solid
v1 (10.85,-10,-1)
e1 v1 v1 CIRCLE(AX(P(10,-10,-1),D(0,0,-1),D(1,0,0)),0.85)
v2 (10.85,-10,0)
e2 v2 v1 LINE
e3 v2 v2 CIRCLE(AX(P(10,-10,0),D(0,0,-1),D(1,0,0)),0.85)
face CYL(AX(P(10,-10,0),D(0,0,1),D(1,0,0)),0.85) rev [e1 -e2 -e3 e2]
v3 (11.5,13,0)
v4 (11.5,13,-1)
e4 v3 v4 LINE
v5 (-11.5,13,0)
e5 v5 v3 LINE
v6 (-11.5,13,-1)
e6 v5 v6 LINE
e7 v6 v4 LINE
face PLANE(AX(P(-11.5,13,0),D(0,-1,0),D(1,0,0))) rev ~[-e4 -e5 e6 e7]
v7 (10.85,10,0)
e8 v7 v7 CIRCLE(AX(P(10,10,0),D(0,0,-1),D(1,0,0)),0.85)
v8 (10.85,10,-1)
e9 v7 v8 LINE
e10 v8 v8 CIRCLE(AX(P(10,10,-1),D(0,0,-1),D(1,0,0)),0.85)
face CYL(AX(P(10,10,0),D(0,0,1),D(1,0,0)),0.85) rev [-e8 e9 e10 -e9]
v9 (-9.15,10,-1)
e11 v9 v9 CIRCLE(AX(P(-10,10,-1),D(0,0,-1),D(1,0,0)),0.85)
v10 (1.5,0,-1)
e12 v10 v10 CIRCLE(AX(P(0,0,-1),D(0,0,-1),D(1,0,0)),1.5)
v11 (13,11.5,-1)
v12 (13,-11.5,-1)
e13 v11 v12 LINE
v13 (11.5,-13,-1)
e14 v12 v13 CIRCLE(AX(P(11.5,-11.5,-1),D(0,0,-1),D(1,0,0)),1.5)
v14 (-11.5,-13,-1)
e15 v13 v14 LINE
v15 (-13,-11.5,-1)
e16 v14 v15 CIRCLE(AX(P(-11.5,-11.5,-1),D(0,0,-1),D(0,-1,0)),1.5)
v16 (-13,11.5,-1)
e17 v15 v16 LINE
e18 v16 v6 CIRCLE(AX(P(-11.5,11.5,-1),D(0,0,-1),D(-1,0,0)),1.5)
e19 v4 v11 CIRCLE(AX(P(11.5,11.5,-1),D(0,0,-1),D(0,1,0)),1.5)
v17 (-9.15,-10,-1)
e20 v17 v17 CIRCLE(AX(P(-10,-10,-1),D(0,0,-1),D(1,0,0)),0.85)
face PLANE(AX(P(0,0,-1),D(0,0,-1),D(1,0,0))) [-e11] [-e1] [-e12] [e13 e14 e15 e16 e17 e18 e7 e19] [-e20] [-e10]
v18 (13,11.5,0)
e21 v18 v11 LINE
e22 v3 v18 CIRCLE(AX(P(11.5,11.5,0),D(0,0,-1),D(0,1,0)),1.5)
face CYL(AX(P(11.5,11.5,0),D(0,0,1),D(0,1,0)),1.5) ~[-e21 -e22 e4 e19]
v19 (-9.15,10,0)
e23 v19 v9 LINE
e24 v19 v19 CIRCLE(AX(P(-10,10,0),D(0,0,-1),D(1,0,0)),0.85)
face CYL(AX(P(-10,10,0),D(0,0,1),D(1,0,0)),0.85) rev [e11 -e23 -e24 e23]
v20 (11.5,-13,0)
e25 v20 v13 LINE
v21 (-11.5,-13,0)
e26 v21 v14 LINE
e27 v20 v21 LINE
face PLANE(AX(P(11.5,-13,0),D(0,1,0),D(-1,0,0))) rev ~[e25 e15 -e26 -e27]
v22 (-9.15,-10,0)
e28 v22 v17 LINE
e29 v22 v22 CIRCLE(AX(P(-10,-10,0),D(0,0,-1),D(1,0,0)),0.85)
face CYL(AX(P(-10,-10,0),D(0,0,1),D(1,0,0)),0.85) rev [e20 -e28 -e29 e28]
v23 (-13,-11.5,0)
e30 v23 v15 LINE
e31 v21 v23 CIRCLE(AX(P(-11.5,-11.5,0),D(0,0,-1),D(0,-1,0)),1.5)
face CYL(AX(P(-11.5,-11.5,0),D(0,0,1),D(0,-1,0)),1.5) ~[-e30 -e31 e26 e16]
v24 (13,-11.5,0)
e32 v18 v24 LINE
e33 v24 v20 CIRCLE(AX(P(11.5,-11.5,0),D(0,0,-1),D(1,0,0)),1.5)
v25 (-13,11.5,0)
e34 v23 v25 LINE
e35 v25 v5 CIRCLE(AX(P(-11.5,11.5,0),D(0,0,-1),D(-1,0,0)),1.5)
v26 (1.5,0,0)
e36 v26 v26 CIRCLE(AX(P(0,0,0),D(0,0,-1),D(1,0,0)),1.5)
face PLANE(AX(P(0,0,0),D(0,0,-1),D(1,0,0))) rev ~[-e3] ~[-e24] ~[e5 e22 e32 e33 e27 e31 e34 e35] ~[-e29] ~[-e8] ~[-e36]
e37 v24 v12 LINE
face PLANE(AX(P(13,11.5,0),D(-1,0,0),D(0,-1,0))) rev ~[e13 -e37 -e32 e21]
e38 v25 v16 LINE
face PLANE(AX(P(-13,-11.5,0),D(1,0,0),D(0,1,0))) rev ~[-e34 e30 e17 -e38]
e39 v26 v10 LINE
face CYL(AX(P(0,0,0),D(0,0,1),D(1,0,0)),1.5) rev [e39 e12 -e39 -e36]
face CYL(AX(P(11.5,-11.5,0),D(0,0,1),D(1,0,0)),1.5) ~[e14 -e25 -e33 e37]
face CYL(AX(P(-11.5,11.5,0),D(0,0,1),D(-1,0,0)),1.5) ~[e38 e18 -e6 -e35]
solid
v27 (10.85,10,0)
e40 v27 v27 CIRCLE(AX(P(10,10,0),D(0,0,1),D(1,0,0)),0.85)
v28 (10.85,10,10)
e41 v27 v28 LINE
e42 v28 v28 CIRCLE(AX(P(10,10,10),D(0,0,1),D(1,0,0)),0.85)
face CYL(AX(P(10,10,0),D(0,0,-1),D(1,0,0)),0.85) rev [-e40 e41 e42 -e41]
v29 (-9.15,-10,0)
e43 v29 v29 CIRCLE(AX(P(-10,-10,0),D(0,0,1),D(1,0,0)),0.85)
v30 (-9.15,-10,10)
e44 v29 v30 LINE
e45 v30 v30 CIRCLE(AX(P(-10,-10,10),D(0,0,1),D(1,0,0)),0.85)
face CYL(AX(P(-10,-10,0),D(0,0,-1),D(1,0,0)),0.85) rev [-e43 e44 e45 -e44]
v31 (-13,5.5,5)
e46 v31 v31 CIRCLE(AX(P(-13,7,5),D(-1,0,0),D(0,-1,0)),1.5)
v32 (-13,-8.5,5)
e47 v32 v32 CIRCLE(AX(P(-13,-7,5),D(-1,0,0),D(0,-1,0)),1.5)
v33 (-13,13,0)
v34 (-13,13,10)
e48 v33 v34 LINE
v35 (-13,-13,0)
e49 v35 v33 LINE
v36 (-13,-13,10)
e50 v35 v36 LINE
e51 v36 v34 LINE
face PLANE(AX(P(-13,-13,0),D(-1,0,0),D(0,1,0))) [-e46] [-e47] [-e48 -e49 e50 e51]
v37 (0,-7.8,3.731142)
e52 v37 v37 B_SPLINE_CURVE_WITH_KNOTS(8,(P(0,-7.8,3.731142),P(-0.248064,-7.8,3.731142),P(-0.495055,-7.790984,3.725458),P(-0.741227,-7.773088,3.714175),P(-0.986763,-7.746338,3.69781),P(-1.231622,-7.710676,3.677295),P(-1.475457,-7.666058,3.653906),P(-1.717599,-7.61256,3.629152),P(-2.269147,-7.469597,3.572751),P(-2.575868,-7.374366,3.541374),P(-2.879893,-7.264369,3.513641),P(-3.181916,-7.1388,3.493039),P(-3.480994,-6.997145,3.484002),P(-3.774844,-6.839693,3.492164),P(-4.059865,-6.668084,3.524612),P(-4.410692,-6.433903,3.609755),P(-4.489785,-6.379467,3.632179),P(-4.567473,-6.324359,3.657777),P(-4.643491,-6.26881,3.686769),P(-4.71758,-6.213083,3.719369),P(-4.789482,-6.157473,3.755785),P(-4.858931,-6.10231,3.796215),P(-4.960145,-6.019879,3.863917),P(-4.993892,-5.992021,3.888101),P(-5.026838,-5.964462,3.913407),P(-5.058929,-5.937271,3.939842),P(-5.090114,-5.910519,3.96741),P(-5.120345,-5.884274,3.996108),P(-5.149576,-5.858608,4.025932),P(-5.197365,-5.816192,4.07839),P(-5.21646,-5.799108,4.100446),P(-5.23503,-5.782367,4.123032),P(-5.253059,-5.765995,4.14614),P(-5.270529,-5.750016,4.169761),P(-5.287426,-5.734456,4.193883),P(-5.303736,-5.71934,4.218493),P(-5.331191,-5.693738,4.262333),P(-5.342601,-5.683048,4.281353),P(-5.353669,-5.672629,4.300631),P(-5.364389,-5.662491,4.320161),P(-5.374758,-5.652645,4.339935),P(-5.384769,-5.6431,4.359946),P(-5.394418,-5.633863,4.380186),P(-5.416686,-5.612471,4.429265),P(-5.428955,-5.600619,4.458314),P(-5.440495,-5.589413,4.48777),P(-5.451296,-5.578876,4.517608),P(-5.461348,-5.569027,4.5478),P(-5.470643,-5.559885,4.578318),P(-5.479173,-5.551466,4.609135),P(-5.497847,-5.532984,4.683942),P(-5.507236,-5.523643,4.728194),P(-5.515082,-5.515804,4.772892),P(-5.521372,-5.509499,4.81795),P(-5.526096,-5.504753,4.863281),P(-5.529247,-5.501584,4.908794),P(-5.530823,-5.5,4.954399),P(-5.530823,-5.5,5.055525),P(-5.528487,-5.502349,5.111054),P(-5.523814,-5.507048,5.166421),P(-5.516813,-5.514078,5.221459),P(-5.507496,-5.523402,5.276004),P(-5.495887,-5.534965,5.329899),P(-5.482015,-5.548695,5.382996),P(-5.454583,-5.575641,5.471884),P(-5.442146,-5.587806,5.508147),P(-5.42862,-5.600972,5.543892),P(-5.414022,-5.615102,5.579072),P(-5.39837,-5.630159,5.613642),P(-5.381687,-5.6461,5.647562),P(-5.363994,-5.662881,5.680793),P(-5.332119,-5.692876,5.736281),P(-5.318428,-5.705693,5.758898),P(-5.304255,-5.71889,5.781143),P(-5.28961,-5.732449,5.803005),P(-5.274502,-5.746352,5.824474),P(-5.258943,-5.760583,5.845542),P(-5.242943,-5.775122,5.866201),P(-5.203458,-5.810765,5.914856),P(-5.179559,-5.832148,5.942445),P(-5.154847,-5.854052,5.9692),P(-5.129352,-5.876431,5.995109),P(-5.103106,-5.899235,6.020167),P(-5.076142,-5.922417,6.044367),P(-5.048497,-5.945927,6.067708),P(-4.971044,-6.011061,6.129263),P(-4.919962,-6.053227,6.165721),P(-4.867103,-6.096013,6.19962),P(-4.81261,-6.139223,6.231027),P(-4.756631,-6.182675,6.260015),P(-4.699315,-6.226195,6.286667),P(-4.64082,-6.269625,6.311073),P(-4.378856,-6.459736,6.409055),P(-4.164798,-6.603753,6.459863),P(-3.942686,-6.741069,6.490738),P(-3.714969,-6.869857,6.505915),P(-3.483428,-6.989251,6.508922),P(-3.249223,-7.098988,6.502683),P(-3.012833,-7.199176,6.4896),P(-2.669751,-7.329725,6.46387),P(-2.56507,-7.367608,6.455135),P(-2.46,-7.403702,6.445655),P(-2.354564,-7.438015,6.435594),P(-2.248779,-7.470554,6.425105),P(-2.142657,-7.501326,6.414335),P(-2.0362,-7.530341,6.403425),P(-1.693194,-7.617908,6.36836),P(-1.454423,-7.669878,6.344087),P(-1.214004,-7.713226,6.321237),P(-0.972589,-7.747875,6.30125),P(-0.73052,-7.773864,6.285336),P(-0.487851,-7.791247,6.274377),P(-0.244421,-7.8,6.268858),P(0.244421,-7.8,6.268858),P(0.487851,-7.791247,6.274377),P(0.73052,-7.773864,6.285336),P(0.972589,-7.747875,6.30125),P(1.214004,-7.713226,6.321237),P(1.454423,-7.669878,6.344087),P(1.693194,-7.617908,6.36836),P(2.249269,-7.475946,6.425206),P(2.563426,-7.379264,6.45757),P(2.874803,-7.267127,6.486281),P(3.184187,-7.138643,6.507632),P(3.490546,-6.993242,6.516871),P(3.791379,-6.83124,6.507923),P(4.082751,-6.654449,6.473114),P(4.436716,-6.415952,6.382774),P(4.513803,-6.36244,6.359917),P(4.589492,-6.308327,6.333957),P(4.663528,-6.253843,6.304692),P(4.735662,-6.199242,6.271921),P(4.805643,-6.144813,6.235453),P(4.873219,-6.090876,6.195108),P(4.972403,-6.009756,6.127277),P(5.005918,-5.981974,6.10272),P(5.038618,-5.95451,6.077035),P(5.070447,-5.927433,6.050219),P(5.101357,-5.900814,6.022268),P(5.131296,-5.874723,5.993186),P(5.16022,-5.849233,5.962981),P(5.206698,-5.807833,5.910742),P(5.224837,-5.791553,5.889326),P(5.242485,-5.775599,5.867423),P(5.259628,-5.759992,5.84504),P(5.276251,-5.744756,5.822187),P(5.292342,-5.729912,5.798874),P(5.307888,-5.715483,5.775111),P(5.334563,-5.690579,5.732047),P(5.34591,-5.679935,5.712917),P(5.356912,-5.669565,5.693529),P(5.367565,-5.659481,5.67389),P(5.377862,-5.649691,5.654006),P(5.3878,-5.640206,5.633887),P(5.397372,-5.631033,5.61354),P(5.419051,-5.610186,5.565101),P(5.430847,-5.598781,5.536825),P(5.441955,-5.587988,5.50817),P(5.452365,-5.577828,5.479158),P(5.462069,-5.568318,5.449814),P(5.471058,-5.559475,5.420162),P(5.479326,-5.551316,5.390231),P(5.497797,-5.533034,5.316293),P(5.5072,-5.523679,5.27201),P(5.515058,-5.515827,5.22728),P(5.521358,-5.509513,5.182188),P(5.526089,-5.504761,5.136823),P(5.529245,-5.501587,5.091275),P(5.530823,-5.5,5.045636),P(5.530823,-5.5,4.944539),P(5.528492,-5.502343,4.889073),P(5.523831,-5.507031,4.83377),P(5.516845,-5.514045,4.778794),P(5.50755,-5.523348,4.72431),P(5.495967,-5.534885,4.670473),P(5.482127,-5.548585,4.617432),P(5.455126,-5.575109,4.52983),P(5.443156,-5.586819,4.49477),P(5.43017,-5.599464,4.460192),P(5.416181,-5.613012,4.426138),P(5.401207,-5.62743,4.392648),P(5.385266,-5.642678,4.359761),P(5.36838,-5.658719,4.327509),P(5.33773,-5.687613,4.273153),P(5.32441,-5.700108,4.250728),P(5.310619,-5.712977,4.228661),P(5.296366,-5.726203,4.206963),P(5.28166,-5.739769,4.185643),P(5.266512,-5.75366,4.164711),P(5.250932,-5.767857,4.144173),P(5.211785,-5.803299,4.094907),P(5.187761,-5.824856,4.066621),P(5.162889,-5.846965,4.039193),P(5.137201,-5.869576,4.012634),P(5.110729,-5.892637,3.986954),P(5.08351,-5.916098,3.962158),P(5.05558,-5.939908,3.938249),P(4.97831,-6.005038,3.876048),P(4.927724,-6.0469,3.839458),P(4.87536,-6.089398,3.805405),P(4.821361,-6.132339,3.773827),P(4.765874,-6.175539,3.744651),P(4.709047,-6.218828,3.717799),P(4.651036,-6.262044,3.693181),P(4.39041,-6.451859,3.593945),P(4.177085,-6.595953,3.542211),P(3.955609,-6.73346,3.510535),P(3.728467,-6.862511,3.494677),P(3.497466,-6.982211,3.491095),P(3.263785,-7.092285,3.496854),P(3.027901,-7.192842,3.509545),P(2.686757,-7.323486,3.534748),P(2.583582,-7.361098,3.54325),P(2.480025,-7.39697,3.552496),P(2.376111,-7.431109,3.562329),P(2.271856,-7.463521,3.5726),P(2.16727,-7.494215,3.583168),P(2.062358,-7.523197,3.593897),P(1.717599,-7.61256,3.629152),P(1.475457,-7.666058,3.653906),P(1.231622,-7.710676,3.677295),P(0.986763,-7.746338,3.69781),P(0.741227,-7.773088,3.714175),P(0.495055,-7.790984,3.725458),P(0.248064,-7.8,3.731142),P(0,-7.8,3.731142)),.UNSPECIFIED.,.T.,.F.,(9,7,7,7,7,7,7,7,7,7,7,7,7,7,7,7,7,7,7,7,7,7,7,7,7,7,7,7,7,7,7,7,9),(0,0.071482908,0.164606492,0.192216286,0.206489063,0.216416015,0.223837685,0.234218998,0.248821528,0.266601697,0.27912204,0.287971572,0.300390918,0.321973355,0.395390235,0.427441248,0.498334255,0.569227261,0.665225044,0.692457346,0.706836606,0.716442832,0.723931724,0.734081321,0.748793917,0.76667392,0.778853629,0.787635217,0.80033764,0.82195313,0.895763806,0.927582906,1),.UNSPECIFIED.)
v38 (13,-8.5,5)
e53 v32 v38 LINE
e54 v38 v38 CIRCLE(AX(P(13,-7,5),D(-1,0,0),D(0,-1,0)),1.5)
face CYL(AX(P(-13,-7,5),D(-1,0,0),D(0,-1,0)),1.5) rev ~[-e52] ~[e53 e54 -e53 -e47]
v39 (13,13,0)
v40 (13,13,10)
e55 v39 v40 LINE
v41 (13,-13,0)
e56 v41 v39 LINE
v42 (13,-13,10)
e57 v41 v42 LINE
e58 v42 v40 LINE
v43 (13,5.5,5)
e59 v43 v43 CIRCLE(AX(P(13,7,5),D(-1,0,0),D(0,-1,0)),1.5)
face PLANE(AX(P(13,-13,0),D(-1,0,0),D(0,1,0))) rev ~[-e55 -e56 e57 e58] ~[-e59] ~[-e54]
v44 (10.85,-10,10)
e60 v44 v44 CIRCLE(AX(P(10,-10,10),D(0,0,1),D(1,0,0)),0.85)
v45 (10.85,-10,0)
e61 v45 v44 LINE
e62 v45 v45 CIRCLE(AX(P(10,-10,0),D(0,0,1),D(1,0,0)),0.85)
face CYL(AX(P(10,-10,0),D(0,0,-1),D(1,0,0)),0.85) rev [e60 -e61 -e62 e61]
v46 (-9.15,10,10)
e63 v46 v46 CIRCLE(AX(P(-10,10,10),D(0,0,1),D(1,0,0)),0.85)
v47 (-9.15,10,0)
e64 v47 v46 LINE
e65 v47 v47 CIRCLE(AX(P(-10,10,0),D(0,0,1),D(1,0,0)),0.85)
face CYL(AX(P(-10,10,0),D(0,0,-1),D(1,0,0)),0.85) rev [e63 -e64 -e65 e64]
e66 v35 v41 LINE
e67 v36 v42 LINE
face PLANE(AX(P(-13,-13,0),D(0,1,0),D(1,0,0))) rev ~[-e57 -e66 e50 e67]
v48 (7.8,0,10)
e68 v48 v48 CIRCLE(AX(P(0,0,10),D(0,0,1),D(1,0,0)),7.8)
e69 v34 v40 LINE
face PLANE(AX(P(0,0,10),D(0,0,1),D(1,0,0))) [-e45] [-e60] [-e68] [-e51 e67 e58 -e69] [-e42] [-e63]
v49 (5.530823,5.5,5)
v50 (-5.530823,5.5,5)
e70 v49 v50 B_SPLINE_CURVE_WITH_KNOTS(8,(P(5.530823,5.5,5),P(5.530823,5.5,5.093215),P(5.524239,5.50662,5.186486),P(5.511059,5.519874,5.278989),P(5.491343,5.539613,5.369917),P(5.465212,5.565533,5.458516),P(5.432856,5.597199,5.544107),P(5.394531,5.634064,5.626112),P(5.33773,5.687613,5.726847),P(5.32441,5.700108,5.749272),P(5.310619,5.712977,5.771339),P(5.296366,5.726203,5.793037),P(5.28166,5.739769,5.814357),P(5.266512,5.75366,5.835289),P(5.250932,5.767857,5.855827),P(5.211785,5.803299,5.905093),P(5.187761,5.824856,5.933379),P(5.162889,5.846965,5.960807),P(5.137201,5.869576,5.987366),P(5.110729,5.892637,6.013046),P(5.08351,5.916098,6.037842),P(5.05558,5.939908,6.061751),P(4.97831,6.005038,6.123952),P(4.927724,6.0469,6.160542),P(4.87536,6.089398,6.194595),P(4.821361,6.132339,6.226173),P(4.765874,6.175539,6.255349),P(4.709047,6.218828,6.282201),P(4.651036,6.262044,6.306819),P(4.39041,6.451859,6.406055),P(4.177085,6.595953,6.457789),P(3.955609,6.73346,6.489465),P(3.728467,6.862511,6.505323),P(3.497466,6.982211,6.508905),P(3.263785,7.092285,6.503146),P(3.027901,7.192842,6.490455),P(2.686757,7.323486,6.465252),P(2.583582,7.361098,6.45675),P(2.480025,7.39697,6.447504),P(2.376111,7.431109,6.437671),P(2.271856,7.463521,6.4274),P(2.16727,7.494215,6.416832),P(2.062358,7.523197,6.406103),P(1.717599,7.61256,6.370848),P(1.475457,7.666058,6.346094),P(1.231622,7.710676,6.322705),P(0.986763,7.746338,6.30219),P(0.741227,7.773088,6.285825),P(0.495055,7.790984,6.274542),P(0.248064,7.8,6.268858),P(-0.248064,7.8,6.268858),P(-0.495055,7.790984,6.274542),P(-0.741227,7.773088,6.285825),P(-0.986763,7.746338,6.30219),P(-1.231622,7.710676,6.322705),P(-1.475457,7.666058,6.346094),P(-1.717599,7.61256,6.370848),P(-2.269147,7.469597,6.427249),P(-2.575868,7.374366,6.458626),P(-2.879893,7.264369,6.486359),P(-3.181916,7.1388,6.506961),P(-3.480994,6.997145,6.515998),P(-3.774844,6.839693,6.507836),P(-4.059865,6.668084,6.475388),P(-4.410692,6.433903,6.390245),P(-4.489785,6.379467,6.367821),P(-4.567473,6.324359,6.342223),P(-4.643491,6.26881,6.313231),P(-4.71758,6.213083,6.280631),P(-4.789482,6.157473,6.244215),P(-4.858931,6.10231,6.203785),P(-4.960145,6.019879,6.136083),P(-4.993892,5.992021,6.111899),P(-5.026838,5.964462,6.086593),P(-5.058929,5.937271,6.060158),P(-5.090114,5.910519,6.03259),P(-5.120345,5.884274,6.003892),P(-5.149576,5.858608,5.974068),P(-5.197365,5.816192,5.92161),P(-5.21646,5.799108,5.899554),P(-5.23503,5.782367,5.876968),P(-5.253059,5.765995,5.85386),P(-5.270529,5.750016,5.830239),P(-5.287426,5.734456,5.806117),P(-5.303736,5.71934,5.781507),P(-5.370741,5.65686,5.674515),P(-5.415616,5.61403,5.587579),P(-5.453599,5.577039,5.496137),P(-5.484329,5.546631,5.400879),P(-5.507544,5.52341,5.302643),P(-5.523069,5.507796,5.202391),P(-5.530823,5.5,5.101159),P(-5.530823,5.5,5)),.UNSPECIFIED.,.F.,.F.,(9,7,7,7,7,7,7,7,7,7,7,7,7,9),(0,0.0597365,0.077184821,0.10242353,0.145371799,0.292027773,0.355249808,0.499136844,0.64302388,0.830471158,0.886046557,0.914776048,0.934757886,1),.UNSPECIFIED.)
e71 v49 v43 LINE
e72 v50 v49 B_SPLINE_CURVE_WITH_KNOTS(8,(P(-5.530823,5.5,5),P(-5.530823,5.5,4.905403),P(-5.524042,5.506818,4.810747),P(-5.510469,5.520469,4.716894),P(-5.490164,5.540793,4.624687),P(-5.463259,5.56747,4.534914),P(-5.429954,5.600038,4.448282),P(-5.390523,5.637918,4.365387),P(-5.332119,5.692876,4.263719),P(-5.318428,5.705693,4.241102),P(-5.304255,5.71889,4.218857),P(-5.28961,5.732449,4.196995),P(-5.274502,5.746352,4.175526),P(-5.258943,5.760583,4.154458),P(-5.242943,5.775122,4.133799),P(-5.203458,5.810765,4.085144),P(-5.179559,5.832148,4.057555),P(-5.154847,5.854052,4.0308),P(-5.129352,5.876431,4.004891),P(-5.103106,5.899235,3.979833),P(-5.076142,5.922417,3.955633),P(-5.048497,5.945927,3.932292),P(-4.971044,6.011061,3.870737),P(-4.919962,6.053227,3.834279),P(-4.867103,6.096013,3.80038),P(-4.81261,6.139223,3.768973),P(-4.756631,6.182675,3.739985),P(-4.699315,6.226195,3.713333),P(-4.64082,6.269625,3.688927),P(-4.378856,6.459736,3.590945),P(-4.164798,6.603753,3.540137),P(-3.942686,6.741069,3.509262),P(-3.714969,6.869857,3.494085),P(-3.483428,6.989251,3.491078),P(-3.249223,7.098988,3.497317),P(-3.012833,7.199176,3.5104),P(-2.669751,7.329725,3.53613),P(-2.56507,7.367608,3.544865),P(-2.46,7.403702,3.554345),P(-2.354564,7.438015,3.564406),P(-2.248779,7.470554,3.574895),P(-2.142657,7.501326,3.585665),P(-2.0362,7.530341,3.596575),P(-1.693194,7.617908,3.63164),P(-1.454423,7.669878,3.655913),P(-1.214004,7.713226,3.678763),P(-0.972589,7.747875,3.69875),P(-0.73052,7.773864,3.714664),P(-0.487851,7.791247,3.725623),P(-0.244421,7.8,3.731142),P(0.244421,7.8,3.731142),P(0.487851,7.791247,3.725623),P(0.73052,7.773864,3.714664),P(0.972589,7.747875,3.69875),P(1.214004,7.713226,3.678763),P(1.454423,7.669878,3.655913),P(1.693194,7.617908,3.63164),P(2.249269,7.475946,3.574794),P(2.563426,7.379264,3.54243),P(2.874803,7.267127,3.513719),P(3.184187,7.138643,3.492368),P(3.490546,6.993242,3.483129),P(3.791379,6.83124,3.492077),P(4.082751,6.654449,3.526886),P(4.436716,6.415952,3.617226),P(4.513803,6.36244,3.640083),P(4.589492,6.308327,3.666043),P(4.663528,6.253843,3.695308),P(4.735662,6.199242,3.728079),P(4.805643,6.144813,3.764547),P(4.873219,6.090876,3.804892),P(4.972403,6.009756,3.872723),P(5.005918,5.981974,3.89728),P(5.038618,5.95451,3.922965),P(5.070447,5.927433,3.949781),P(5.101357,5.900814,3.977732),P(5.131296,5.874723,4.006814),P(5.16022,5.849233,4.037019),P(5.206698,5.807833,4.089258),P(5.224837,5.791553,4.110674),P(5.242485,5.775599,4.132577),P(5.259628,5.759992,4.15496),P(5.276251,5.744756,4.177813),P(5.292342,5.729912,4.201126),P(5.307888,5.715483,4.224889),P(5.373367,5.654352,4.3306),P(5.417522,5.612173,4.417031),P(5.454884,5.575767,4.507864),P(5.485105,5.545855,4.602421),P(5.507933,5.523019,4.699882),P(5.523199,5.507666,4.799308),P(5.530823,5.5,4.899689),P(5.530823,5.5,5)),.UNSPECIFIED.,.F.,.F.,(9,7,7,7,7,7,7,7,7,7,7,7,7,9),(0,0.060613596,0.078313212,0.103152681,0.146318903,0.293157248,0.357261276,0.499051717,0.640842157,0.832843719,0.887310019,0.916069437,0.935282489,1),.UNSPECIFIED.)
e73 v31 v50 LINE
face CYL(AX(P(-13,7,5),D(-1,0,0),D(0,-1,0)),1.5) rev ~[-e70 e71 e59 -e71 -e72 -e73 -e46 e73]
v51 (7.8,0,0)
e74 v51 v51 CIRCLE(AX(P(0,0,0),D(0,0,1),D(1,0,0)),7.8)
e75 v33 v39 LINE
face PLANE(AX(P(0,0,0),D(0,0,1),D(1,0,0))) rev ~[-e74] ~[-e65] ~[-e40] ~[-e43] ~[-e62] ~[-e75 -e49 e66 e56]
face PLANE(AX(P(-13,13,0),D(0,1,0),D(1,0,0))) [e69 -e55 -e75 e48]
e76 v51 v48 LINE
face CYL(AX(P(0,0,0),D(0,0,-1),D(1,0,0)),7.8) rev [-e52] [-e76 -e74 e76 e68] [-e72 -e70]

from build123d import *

# Parameters (mm, degrees)
F0_W     = 26
F0_H     = 26
F0_R     = 0.85
F0_R_2   = 7.8
F1_DEPTH = 10
F2_R     = 1.5
F3_DEPTH = 26.001
F4_R     = 0.85
F4_R_2   = 7.8
F4_R_3   = 1.5
F5_DEPTH = 1


with BuildPart() as f1:
    # F0 (on Top) → F1 (new body)
    with BuildSketch(Plane.XY):
        Rectangle(F0_W, F0_H)
        with Locations((-10, -10)):
            Circle(F0_R, mode=Mode.SUBTRACT)
        with Locations((10, -10)):
            Circle(F0_R, mode=Mode.SUBTRACT)
        with Locations((-10, 10)):
            Circle(F0_R, mode=Mode.SUBTRACT)
        Circle(F0_R_2, mode=Mode.SUBTRACT)
        with Locations((10, 10)):
            Circle(F0_R, mode=Mode.SUBTRACT)
    extrude(amount=F1_DEPTH)

    # F2 (on face) → F3 (cut, through all)
    with BuildSketch(Plane(origin=(-13, 0, 0), x_dir=(0, -1, 0), z_dir=(-1, 0, 0))):
        with Locations((-7, 5)):
            Circle(F2_R)
        with Locations((7, 5)):
            Circle(F2_R)
    extrude(amount=-F3_DEPTH, mode=Mode.SUBTRACT)


with BuildPart() as f5:
    # F4 (on face) → F5 (new body)
    with BuildSketch(Plane(origin=(0, 0, 0), x_dir=(1, 0, 0), z_dir=(0, 0, -1))):
        with BuildLine():
            ThreePointArc((-11.5, 13), (-12.5606601718, 12.5606601718), (-13, 11.5))
            Line((-13, 11.5), (-13, -11.5))
            ThreePointArc((-13, -11.5), (-12.5606601718, -12.5606601718), (-11.5, -13))
            Line((-11.5, -13), (11.5, -13))
            ThreePointArc((11.5, -13), (12.5606601718, -12.5606601718), (13, -11.5))
            Line((13, -11.5), (13, 11.5))
            ThreePointArc((13, 11.5), (12.5606601718, 12.5606601718), (11.5, 13))
            Line((11.5, 13), (-11.5, 13))
        make_face()
        with Locations((-10, -10)):
            Circle(F4_R, mode=Mode.SUBTRACT)
        with Locations((10, -10)):
            Circle(F4_R, mode=Mode.SUBTRACT)
        with Locations((-10, 10)):
            Circle(F4_R, mode=Mode.SUBTRACT)
        Circle(F4_R_2, mode=Mode.SUBTRACT)
        with Locations((10, 10)):
            Circle(F4_R, mode=Mode.SUBTRACT)
        Circle(F4_R_2)
        Circle(F4_R_3, mode=Mode.SUBTRACT)
    extrude(amount=F5_DEPTH)


solid = Compound([f1.part, f5.part])
